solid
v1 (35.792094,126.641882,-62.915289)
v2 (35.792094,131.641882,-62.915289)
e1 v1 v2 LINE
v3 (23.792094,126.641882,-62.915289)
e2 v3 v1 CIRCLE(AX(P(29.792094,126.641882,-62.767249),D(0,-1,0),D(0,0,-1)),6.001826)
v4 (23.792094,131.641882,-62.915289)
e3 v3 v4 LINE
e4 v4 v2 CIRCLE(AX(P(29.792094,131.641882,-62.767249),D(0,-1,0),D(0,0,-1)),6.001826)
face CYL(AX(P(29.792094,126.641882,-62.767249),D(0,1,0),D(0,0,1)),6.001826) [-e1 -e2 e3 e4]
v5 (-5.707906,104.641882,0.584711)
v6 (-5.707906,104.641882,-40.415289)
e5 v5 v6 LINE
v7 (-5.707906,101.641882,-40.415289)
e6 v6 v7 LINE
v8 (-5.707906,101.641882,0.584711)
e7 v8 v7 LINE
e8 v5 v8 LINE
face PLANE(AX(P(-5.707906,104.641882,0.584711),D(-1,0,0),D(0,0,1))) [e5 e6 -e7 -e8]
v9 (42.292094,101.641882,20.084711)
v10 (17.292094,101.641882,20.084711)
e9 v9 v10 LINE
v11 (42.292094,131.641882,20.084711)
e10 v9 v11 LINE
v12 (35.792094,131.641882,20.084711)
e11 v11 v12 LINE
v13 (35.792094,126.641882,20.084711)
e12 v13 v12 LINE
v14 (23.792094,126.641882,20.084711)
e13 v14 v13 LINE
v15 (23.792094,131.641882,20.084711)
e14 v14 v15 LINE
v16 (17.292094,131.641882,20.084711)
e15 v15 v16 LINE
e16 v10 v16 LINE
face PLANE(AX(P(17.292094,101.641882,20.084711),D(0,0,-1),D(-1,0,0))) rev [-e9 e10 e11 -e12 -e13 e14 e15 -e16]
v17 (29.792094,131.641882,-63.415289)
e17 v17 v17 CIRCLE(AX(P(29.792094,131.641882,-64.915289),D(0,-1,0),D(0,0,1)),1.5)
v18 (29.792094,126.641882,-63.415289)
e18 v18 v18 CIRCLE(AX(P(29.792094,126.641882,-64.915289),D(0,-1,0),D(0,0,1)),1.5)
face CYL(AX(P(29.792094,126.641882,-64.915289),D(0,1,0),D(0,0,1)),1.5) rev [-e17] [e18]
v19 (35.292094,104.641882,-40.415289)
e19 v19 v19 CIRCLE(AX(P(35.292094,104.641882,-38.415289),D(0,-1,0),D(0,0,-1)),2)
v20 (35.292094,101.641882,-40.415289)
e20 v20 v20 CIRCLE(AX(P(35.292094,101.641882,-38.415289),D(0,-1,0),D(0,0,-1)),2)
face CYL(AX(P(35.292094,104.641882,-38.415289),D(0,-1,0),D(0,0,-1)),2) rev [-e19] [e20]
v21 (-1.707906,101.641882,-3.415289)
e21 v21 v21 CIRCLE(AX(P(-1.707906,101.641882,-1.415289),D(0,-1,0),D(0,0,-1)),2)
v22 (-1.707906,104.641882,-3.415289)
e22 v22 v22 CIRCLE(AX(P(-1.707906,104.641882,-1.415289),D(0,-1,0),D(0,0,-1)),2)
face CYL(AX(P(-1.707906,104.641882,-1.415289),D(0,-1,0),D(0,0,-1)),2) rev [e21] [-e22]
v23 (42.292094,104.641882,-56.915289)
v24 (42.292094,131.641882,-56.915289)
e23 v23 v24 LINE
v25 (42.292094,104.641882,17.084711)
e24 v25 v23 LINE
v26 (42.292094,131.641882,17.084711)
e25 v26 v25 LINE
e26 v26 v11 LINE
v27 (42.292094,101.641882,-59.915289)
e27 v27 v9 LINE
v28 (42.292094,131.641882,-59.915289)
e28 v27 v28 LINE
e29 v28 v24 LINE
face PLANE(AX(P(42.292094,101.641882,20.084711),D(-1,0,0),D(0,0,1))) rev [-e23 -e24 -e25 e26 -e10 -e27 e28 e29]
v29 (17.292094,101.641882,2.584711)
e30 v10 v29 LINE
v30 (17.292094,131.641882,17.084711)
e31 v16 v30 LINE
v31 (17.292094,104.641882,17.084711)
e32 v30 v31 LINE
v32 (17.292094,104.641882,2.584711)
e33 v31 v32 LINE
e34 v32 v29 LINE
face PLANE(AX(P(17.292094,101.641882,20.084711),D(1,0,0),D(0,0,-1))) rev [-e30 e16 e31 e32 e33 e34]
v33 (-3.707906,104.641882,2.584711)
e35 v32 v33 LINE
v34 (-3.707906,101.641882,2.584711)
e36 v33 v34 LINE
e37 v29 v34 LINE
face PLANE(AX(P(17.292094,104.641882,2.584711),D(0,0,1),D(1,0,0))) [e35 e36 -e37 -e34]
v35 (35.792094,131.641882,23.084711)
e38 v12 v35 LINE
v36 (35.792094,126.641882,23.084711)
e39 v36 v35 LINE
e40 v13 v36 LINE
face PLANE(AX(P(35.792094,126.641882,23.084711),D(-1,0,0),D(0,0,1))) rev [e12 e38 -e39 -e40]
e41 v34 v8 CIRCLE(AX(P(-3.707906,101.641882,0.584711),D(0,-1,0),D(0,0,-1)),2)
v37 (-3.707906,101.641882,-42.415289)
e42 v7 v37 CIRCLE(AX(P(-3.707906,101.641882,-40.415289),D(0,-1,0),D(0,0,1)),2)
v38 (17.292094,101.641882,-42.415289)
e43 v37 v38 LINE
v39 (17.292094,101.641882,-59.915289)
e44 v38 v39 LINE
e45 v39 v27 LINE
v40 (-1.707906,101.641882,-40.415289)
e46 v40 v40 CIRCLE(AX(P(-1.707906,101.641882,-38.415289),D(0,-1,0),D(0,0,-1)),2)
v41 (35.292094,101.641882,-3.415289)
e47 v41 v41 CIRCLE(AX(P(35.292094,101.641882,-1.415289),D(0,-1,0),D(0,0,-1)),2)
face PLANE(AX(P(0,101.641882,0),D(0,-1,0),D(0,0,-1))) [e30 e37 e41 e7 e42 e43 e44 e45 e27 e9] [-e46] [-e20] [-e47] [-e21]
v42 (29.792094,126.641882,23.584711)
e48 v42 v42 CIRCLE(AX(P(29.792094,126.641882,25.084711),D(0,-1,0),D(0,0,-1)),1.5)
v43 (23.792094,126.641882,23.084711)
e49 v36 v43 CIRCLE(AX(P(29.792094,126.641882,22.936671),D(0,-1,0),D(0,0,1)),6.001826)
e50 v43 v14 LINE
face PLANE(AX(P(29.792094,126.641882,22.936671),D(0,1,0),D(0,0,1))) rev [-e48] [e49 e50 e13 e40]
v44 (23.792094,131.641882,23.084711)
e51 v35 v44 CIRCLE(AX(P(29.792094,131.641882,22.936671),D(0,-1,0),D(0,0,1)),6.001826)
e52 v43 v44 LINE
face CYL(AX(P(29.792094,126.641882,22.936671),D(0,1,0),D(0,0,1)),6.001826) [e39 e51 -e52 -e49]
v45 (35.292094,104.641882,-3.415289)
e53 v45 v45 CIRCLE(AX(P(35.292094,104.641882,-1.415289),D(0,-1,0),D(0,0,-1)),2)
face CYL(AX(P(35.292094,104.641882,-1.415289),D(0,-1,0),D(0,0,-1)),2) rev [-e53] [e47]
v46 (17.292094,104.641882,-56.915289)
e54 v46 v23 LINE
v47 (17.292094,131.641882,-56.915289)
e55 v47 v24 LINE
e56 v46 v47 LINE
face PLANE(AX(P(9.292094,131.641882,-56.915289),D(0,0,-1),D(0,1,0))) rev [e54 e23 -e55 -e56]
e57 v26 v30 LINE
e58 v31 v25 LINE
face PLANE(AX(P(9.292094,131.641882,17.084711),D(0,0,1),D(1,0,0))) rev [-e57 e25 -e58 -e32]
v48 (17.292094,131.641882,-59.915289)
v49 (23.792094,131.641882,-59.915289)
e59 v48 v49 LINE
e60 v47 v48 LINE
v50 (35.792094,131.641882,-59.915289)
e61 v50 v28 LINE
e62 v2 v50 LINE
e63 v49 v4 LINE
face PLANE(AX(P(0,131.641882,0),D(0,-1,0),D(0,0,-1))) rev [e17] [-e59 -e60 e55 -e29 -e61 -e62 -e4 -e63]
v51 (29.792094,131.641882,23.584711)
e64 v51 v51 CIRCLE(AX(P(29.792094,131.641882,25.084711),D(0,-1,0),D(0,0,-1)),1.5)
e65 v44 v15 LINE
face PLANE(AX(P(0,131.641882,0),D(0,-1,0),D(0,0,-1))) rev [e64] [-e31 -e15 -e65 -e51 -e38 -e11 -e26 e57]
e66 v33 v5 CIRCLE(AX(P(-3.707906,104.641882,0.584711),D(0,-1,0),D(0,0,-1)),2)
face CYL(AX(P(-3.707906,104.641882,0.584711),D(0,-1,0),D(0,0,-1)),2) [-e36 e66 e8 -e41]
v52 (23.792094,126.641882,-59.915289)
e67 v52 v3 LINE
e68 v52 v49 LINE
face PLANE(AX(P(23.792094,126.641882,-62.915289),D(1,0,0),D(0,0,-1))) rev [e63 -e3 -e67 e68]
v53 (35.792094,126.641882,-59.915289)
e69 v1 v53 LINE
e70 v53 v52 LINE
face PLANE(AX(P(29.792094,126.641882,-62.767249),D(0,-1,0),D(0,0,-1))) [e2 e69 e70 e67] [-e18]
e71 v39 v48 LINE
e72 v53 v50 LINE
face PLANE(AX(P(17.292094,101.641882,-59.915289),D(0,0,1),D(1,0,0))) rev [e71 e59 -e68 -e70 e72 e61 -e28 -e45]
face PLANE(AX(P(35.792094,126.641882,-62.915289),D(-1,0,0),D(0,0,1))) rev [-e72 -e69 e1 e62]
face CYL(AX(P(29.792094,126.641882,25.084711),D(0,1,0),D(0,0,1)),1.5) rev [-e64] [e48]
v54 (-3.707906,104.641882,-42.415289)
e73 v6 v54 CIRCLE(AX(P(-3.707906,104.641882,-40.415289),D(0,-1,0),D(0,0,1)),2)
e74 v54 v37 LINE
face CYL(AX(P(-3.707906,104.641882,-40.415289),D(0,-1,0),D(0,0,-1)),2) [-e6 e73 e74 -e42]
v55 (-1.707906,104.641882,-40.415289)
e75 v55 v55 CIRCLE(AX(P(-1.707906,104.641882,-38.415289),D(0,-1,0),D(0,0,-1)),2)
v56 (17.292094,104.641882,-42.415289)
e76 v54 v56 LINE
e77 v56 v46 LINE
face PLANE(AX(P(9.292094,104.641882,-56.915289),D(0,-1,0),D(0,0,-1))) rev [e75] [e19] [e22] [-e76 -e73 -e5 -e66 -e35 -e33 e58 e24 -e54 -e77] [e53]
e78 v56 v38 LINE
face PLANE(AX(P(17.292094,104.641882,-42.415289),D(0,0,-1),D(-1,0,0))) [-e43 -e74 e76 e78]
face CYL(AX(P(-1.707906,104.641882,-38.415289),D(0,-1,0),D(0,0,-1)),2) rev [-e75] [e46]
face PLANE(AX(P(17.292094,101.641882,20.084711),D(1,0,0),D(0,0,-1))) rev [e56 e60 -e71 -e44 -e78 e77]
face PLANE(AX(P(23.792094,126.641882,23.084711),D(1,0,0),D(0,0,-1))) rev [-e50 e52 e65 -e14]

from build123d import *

# Parameters (mm, degrees)
EXTRUDE_1_OUTLINE_W = 25
EXTRUDE_1_OUTLINE_H = 80
EXTRUDE_1_DEPTH     = 30
SKETCH_2_W          = 74
SKETCH_2_H          = 27
CUT_EXTRUDE_1_DEPTH = 33
SKETCH_3_R          = 1.5
EXTRUDE_2_DEPTH     = 5
SKETCH_4_R          = 2
EXTRUDE_3_DEPTH     = 3
SKETCH_5_R          = 2
CUT_EXTRUDE_2_DEPTH = 3


# Read off the part's stored shape, not the designer's step: 填料-伸長1
with BuildPart() as part:
    # 填料-伸長1 outline → 填料-伸長1 (new body)
    with BuildSketch(Plane.XZ.offset(-131.641882403)):
        with Locations((29.792094012, -19.915289206)):
            Rectangle(EXTRUDE_1_OUTLINE_W, EXTRUDE_1_OUTLINE_H)
    extrude(amount=EXTRUDE_1_DEPTH)

    # 草圖2 → 除料-伸長1 (cut)
    with BuildSketch(Plane(origin=(42.292094012, 0, 0), x_dir=(0, 0, -1), z_dir=(1, 0, 0))):
        with Locations((19.915289206, 118.141882403)):
            Rectangle(SKETCH_2_W, SKETCH_2_H)
    extrude(amount=-CUT_EXTRUDE_1_DEPTH, mode=Mode.SUBTRACT)

    # 草圖3 → 填料-伸長2 (add)
    # profile 1 of 2: a face of its own
    with BuildSketch(Plane.XZ.offset(-131.641882403)):
        with BuildLine():
            Line((23.792094012, 20.084710794), (35.792094012, 20.084710794))
            Line((35.792094012, 20.084710794), (35.792094012, 23.084710794))
            ThreePointArc((35.792094012, 23.084710794), (29.792094012, 28.938496633), (23.792094012, 23.084710794))
            Line((23.792094012, 23.084710794), (23.792094012, 20.084710794))
        make_face()
        with Locations(Location((29.792094012, 25.084710794, 0), (0, 0, 270))):
            Circle(SKETCH_3_R, mode=Mode.SUBTRACT)
    # profile 2 of 2: a face of its own
    with BuildSketch(Plane.XZ.offset(-131.641882403)):
        with BuildLine():
            Line((23.792094012, -62.915289206), (23.792094012, -59.915289206))
            Line((23.792094012, -59.915289206), (35.792094012, -59.915289206))
            Line((35.792094012, -59.915289206), (35.792094012, -62.915289206))
            ThreePointArc((35.792094012, -62.915289206), (29.792094012, -68.769075045), (23.792094012, -62.915289206))
        make_face()
        with Locations(Location((29.792094012, -64.915289206, 0), (0, 0, 90))):
            Circle(SKETCH_3_R, mode=Mode.SUBTRACT)
    extrude(amount=EXTRUDE_2_DEPTH)

    # 草圖4 → 填料-伸長3 (add)
    with BuildSketch(Plane.XZ.offset(-101.641882403)):
        with BuildLine():
            Line((17.292094012, 2.584710794), (-3.707905988, 2.584710794))
            ThreePointArc((-3.707905988, 2.584710794), (-5.12211955, 1.998924356), (-5.707905988, 0.584710794))
            Line((-5.707905988, 0.584710794), (-5.707905988, -40.415289206))
            ThreePointArc((-5.707905988, -40.415289206), (-5.12211955, -41.829502769), (-3.707905988, -42.415289206))
            Line((-3.707905988, -42.415289206), (17.292094012, -42.415289206))
            Line((17.292094012, -42.415289206), (17.292094012, 2.584710794))
        make_face()
        with Locations(Location((-1.707905988, -38.415289206, 0), (0, 0, 270))):
            Circle(SKETCH_4_R, mode=Mode.SUBTRACT)
        with Locations(Location((-1.707905988, -1.415289206, 0), (0, 0, 270))):
            Circle(SKETCH_4_R, mode=Mode.SUBTRACT)
    extrude(amount=-EXTRUDE_3_DEPTH)

    # 草圖5 → 除料-伸長2 (cut)
    with BuildSketch(Plane.XZ.offset(-101.641882403)):
        with Locations(Location((35.292094012, -1.415289206, 0), (0, 0, 270))):
            Circle(SKETCH_5_R)
        with Locations(Location((35.292094012, -38.415289206, 0), (0, 0, 270))):
            Circle(SKETCH_5_R)
    extrude(amount=-CUT_EXTRUDE_2_DEPTH, mode=Mode.SUBTRACT)


solid = part.part
